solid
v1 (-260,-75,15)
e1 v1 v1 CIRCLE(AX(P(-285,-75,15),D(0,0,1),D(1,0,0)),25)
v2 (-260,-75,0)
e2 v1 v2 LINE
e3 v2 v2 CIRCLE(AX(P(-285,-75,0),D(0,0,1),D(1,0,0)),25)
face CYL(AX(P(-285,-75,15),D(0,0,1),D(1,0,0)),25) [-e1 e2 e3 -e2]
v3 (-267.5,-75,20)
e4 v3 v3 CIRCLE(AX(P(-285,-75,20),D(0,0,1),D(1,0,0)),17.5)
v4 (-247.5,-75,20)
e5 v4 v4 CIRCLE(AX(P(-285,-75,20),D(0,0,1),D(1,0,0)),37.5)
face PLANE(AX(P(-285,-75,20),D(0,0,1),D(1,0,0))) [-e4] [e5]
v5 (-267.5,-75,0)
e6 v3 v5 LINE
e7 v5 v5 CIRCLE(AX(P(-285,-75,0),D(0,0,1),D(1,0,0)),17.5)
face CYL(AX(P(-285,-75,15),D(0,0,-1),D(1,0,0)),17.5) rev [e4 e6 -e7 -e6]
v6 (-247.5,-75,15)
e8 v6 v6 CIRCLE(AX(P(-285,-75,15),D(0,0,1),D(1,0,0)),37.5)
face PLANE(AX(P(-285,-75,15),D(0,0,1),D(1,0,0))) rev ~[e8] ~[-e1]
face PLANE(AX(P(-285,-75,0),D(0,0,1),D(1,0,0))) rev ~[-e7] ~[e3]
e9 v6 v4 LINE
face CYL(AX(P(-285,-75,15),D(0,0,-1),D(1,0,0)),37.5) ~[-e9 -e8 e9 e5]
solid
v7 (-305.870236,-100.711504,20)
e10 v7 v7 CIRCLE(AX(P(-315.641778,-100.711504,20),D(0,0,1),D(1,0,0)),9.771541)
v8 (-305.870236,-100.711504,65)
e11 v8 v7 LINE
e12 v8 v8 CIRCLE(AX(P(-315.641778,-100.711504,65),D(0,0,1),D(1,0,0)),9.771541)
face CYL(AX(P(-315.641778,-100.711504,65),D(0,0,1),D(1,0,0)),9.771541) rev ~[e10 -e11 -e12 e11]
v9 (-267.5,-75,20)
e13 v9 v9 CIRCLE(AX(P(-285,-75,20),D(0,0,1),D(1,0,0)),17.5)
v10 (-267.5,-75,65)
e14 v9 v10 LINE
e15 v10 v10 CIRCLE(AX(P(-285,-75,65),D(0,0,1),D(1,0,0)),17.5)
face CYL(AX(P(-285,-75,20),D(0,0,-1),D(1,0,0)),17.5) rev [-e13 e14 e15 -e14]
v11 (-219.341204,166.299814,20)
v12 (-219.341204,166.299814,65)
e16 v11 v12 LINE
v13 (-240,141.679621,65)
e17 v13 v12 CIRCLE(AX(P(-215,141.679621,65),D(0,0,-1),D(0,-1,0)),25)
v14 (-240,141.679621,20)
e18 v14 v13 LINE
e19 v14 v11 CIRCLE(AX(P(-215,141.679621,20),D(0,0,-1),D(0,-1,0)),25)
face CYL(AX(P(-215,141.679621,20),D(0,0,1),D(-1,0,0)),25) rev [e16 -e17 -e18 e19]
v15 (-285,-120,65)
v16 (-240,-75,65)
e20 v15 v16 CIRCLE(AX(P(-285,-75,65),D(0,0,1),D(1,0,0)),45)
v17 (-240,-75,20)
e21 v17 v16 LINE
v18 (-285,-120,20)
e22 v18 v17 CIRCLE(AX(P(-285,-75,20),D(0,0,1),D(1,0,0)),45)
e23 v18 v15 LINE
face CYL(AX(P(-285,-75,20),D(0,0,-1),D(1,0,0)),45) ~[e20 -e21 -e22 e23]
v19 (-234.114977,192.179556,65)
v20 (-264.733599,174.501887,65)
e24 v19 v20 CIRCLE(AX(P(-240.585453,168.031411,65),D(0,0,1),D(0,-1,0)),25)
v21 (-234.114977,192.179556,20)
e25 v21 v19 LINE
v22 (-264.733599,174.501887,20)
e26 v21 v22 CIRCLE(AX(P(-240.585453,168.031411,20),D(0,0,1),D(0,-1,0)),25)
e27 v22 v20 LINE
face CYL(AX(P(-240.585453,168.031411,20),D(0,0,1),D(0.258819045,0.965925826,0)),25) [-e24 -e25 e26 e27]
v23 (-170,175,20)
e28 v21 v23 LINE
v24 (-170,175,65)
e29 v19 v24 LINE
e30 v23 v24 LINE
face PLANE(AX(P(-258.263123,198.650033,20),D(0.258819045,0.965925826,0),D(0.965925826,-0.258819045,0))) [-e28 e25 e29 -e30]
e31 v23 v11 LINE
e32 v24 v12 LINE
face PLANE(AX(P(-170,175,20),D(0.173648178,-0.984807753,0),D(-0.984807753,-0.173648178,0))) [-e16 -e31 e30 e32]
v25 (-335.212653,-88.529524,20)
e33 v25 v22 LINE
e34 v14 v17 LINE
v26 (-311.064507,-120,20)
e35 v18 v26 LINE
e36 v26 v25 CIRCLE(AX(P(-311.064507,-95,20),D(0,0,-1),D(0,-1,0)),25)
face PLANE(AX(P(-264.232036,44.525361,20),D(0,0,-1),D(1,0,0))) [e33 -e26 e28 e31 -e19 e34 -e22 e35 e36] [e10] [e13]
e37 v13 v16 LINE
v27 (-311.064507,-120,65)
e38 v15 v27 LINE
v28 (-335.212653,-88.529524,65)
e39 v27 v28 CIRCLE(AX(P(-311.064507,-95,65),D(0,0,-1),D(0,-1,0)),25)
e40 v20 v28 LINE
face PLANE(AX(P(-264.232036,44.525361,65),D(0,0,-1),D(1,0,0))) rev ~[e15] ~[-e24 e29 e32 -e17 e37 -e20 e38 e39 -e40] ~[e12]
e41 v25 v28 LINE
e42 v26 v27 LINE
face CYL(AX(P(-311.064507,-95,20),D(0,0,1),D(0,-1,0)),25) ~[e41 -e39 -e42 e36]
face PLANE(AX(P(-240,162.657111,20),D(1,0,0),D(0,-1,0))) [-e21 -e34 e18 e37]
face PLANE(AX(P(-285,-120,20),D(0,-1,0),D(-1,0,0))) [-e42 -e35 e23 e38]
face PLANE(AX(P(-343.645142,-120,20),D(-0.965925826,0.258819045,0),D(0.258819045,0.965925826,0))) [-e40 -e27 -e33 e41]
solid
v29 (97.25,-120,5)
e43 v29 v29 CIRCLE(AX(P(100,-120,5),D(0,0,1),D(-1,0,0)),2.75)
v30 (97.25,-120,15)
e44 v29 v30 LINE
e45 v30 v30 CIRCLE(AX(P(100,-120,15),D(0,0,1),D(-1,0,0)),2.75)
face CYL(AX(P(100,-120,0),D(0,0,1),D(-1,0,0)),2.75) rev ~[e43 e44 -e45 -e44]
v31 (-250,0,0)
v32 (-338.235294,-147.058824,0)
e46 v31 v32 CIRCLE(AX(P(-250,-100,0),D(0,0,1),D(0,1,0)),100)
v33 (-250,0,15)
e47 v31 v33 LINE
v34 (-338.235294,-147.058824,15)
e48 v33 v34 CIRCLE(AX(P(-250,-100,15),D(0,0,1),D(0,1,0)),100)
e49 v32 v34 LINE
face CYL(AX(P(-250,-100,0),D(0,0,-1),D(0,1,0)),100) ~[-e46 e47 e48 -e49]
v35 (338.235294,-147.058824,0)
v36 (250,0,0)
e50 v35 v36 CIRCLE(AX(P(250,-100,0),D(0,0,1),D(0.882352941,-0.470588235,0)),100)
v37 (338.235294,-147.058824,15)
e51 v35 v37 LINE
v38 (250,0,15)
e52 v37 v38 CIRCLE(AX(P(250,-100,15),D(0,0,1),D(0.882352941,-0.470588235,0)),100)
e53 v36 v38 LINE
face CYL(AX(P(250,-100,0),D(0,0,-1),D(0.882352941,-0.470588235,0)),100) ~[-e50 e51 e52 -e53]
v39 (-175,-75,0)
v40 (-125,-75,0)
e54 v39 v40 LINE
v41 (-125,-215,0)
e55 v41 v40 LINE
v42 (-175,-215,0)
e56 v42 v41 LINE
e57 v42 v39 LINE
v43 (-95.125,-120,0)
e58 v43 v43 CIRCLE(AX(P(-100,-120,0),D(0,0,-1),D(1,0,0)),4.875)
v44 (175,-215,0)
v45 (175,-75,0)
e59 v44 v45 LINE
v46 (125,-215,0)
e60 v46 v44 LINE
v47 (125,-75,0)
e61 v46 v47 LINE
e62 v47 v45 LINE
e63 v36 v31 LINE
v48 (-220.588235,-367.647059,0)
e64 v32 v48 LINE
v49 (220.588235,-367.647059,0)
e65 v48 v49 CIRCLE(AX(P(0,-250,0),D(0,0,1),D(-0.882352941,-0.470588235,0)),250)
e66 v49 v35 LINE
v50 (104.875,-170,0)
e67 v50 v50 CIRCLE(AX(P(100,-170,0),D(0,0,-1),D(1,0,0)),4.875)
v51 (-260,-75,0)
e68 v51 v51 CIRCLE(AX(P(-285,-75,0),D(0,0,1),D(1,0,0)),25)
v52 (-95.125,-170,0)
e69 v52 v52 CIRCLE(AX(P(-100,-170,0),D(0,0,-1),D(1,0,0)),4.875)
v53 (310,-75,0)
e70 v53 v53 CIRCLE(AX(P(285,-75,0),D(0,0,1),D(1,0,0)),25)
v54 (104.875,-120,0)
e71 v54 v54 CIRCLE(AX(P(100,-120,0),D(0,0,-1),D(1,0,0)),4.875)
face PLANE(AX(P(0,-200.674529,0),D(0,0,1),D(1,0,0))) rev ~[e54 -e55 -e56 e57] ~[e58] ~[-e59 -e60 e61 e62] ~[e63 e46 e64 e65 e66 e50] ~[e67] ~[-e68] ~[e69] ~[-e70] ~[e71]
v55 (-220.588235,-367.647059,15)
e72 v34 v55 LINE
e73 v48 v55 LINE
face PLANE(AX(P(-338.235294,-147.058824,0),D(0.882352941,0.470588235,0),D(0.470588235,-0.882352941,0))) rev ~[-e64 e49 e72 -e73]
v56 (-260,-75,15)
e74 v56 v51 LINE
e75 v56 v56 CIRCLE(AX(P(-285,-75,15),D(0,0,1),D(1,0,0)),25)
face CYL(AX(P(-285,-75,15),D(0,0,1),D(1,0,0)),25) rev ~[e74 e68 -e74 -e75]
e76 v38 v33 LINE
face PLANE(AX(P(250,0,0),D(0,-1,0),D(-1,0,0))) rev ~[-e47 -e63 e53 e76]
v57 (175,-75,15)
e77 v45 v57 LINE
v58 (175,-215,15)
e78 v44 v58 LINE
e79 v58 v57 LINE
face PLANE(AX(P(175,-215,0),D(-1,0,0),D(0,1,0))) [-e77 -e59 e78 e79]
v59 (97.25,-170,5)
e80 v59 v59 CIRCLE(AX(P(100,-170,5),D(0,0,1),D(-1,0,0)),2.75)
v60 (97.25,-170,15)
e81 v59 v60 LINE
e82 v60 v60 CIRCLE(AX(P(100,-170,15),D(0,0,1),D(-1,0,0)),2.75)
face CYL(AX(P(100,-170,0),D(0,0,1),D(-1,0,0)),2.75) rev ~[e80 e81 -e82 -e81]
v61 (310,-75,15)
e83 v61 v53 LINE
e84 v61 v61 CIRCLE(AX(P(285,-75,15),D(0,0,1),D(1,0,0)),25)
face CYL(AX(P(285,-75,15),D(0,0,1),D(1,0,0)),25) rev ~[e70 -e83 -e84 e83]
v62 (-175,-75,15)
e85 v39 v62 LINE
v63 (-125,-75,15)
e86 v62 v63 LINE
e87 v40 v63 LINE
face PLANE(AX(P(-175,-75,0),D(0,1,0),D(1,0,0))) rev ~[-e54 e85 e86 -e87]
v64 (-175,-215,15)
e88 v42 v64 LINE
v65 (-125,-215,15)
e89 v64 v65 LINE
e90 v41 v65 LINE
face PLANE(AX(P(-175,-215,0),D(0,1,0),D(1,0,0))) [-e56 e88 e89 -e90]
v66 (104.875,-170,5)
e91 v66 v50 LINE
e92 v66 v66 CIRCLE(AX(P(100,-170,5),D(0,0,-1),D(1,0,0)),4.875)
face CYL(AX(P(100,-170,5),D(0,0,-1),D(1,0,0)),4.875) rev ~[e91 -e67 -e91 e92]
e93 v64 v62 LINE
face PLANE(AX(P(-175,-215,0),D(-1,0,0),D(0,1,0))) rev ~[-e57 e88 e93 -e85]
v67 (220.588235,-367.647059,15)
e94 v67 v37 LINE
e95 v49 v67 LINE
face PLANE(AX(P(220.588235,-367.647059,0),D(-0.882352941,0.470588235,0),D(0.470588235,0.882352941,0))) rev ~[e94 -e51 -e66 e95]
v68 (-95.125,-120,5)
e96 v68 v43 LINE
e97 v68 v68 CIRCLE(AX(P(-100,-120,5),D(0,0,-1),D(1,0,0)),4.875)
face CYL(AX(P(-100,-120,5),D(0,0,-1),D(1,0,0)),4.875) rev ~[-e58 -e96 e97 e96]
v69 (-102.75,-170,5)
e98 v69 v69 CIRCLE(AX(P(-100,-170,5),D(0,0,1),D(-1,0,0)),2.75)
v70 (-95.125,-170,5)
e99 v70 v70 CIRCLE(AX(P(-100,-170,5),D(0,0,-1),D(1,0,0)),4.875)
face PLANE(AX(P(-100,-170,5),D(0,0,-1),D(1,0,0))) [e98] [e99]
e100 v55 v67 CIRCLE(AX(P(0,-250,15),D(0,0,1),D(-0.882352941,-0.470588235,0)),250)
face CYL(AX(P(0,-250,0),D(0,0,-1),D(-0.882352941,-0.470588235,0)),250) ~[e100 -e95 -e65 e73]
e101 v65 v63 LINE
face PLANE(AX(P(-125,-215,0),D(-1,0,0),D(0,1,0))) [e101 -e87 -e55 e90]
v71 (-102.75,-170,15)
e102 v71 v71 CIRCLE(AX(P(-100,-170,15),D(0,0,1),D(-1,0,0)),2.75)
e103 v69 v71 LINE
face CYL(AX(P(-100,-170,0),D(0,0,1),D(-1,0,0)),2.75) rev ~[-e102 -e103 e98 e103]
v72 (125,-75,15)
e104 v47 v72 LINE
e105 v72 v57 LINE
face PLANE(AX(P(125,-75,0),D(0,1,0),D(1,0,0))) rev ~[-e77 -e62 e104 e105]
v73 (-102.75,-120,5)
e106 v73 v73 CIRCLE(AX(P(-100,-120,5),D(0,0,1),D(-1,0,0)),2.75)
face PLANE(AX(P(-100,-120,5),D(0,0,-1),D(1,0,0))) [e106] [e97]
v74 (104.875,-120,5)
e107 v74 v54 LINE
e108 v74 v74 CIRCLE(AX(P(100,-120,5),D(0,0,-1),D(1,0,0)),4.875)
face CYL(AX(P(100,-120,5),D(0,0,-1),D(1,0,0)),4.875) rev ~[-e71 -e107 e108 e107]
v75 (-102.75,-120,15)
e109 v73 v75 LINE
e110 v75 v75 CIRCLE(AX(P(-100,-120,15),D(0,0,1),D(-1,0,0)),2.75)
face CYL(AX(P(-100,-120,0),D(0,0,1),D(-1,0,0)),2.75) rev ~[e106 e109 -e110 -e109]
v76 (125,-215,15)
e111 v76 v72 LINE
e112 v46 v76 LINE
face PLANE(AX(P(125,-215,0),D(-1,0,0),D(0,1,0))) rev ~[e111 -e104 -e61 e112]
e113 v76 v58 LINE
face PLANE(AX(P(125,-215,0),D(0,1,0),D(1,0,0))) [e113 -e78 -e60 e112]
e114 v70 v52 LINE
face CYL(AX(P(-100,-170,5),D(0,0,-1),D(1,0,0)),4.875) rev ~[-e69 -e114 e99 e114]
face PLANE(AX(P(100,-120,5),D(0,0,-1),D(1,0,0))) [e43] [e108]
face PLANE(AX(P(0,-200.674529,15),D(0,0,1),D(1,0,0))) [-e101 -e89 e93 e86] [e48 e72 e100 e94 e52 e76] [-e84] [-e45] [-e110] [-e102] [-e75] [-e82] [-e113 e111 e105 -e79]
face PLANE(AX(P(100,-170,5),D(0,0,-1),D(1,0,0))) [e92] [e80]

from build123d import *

# Parameters (mm, degrees)
F0_W           = 50
F0_H           = 140
F1_DEPTH       = 15
F2_R           = 25
F3_DEPTH       = 15.001
F4_R           = 25
F4_R_2         = 17.5
F5_DEPTH       = 15
F6_R           = 37.5
F6_R_2         = 17.5
F7_DEPTH       = 5
F9_D           = 5.5
F9_CBORE_D     = 9.75
F9_CBORE_DEPTH = 5
F10_R          = 45
F10_R_2        = 17.5
F11_DEPTH      = 45
F12_R          = 17.5
F13_DEPTH      = 45
F14_R          = 9.7715412821
F15_DEPTH      = 65.001
F16_R          = 25


with BuildPart() as f1:
    # F0 (on Top) → F1 (new body)
    with BuildSketch(Plane.XY):
        with BuildLine():
            Line((250, 0), (-250, 0))
            ThreePointArc((-250, 0), (-335.7492925713, -48.5504244572), (-338.2352941176, -147.0588235294))
            Line((-338.2352941176, -147.0588235294), (-220.5882352941, -367.6470588235))
            ThreePointArc((-220.5882352941, -367.6470588235), (0, -500), (220.5882352941, -367.6470588235))
            Line((220.5882352941, -367.6470588235), (338.2352941176, -147.0588235294))
            ThreePointArc((338.2352941176, -147.0588235294), (335.7492925713, -48.5504244572), (250, 0))
        make_face()
        with Locations((-150, -145)):
            Rectangle(F0_W, F0_H, mode=Mode.SUBTRACT)
        with Locations((150, -145)):
            Rectangle(F0_W, F0_H, mode=Mode.SUBTRACT)
    extrude(amount=F1_DEPTH)

    # F2 (on face) → F3 (cut, through all)
    with BuildSketch(Plane.XY.offset(15)):
        with Locations((-285, -75)):
            Circle(F2_R)
        with Locations((285, -75)):
            Circle(F2_R)
    extrude(amount=-F3_DEPTH, mode=Mode.SUBTRACT)

    # F9 (through all)
    with Locations(Plane(origin=(0, 0, 0), x_dir=(1, 0, 0), z_dir=(0, 0, -1))):
        with Locations((-100, 120), (-100, 170), (100, 120), (100, 170)):
            CounterBoreHole(F9_D / 2, F9_CBORE_D / 2, F9_CBORE_DEPTH)


with BuildPart() as f5:
    # F4 (on face) → F5 (new body)
    with BuildSketch(Plane.XY.offset(15)):
        with Locations((-285, -75)):
            Circle(F4_R)
        with Locations((-285, -75)):
            Circle(F4_R_2, mode=Mode.SUBTRACT)
    extrude(amount=-F5_DEPTH)

    # F6 (on face) → F7 (join)
    with BuildSketch(Plane.XY.offset(15)):
        with Locations((-285, -75)):
            Circle(F6_R)
        with Locations((-285, -75)):
            Circle(F6_R_2, mode=Mode.SUBTRACT)
    extrude(amount=F7_DEPTH)


with BuildPart() as f11:
    # F10 (on face) → F11 (new body)
    with BuildSketch(Plane.XY.offset(20)):
        with Locations((-285, -75)):
            Circle(F10_R)
        with Locations((-285, -75)):
            Circle(F10_R_2, mode=Mode.SUBTRACT)
    extrude(amount=F11_DEPTH)

    # F12 (on face) → F13 (join, through all)
    with BuildSketch(Plane(origin=(0, 0, 20), x_dir=(1, 0, 0), z_dir=(0, 0, -1))):
        with BuildLine():
            Line((-240, -162.6571113504), (-240, 75))
            ThreePointArc((-240, 75), (-253.1801948466, 106.8198051534), (-285, 120))
            Line((-285, 120), (-343.6451417779, 120))
            Line((-343.6451417779, 120), (-258.2631229006, -198.6500325027))
            Line((-258.2631229006, -198.6500325027), (-170, -175))
            Line((-170, -175), (-240, -162.6571113504))
        make_face()
        with Locations((-285, 75)):
            Circle(F12_R, mode=Mode.SUBTRACT)
    extrude(amount=-F13_DEPTH)

    # F14 (on face) → F15 (cut, through all)
    with BuildSketch(Plane.XY.offset(65)):
        with Locations((-315.6417777248, -100.7115043875)):
            Circle(F14_R)
    extrude(amount=-F15_DEPTH, mode=Mode.SUBTRACT)

    # F16
    f16_edges = [f11.edges().sort_by_distance(p)[0] for p in [
        (-240, 162.657111, 42.5),
        (-258.263123, 198.650033, 42.5),
        (-343.645142, -120, 42.5),
    ]]
    fillet(f16_edges, radius=F16_R)


solid = Compound([f1.part, f5.part, f11.part])
